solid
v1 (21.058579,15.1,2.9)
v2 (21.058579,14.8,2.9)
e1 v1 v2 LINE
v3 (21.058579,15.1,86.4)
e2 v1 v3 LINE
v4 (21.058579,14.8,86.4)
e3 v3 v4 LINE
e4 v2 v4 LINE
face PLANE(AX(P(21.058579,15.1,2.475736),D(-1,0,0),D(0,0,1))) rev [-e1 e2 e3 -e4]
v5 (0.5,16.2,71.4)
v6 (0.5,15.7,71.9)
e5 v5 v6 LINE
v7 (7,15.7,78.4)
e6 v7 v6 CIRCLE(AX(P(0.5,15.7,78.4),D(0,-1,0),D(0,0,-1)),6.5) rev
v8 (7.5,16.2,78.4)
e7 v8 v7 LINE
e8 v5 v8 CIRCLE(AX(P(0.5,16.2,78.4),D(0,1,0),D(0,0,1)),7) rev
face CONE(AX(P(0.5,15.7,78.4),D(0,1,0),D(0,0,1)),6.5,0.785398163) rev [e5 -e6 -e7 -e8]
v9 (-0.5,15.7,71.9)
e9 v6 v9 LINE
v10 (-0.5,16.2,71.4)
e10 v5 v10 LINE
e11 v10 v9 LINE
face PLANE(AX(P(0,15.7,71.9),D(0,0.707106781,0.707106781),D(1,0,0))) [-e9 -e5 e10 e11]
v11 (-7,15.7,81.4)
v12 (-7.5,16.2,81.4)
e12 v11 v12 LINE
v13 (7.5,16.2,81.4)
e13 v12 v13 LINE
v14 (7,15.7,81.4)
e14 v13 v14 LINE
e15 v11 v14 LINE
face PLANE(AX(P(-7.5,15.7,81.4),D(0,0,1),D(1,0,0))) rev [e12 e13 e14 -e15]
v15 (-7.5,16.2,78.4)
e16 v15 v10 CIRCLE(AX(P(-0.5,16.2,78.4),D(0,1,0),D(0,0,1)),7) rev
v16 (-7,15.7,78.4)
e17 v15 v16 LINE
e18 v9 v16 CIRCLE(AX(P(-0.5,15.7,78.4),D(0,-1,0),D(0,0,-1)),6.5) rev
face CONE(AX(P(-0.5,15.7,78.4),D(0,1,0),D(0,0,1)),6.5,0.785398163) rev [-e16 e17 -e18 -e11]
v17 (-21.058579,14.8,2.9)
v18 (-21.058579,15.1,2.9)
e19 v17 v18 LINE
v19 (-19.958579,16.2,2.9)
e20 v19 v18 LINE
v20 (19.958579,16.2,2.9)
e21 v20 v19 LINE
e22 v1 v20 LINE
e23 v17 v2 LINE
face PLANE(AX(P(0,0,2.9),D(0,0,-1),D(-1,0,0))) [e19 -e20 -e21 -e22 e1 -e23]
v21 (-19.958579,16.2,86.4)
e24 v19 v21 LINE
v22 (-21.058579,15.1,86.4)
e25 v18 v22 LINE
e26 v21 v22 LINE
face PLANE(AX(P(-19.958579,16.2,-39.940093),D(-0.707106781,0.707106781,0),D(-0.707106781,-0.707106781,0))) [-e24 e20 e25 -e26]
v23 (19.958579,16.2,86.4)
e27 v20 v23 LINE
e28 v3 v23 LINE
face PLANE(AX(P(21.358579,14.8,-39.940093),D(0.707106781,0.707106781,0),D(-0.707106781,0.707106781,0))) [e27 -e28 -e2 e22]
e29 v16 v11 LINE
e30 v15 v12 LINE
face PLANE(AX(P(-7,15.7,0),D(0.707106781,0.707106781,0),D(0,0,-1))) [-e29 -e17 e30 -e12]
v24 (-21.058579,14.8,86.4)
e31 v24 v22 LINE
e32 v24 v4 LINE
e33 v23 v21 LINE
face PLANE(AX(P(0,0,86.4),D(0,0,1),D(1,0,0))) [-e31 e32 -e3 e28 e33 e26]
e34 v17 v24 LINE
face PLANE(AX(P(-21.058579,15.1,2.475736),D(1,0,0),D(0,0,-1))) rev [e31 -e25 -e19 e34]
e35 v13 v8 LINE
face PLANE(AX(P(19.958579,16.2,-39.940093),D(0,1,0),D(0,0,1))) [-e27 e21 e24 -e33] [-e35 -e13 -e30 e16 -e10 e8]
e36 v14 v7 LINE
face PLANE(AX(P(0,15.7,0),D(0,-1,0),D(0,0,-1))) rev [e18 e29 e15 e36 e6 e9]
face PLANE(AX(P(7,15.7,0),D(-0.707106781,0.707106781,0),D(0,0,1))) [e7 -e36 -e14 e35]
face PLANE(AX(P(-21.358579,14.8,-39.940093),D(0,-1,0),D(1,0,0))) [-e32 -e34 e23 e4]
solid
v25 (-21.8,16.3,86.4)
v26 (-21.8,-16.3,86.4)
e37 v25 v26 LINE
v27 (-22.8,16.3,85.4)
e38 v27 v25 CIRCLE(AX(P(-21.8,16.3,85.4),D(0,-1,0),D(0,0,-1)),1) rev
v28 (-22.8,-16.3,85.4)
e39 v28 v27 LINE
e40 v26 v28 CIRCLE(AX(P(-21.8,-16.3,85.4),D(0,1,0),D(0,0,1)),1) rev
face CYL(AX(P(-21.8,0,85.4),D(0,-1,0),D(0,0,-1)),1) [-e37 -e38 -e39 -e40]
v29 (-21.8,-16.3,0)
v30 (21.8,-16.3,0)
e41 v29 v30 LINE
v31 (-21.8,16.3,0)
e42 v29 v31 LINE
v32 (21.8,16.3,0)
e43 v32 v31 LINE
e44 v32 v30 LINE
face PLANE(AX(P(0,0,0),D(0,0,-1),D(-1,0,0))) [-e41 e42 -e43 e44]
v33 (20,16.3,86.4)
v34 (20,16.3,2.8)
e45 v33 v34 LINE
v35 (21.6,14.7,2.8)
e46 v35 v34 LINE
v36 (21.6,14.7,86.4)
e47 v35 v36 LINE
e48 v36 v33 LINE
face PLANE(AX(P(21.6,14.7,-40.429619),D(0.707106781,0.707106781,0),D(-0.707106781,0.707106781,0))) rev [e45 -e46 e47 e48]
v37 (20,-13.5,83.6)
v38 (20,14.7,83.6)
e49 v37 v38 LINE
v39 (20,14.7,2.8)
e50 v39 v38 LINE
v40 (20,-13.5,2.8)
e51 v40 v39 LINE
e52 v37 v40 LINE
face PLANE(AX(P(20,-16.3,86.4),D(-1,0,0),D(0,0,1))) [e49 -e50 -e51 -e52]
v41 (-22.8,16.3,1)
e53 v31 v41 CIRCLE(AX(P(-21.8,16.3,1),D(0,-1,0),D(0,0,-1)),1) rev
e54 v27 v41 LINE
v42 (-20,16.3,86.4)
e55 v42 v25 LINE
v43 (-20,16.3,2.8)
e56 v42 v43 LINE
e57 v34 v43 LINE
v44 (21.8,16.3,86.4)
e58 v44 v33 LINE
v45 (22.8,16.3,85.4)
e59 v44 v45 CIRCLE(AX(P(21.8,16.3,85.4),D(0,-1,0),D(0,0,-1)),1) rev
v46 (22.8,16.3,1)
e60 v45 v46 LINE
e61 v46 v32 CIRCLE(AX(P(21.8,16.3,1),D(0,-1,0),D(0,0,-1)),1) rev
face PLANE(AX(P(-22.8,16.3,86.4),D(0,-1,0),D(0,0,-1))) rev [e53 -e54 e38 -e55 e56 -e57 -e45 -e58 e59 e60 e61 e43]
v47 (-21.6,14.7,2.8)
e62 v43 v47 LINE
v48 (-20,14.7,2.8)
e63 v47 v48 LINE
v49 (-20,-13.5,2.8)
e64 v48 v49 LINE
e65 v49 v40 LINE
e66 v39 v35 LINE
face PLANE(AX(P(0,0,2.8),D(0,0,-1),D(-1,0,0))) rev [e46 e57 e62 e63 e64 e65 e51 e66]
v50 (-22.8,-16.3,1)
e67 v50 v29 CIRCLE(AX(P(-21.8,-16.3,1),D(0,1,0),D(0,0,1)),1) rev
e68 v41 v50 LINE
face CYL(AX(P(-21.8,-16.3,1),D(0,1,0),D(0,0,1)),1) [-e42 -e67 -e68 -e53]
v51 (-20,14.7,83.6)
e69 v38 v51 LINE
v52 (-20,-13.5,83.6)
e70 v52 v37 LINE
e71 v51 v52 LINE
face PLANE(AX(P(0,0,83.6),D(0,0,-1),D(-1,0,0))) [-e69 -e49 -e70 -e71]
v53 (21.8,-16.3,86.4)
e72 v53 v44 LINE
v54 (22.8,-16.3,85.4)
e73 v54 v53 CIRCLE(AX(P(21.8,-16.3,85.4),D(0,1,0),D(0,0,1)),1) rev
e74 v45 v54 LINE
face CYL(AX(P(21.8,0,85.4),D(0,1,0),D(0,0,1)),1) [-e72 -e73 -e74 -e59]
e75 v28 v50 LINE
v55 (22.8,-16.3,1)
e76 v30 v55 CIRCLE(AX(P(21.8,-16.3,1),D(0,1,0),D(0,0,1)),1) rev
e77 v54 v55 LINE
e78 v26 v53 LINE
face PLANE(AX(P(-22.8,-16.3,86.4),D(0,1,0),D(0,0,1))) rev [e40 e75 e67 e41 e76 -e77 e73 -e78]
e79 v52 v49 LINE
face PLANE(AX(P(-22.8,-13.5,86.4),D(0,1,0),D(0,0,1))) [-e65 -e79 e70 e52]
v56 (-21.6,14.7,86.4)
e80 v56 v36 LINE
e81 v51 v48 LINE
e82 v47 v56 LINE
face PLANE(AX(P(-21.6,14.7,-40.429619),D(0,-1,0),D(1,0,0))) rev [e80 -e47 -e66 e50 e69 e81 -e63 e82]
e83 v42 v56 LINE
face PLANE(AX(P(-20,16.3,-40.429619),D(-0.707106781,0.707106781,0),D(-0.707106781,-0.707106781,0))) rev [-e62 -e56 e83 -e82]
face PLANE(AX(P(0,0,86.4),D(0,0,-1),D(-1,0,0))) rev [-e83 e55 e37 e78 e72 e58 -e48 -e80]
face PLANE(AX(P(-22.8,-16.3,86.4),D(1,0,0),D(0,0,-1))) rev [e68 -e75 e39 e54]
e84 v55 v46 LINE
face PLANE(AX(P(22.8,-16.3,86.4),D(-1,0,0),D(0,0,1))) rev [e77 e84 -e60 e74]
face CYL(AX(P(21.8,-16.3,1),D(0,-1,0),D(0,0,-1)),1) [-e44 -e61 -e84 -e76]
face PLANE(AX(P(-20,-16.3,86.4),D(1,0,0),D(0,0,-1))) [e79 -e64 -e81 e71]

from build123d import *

# Parameters (mm, degrees)
SKETCH1_W           = 45.6
SKETCH1_H           = 32.6
BOSS_EXTRUDE1_DEPTH = 86.4
SHELL1_T            = -2.8
CUT_EXTRUDE1_DEPTH  = 83.6
BOSS_EXTRUDE2_DEPTH = 83.5
SKETCH5_W           = 15
SKETCH5_H           = 10
CUT_EXTRUDE3_DEPTH  = 0.5
FILLET1_R           = 7
CHAMFER1_SIZE       = 0.5
FILLET2_R           = 1
CUT_EXTRUDE4_DEPTH  = 83.5


with BuildPart() as part:
    # Sketch1 → Boss-Extrude1 (new body)
    with BuildSketch(Plane.XY):
        Rectangle(SKETCH1_W, SKETCH1_H)
    extrude(amount=BOSS_EXTRUDE1_DEPTH)

    # Shell1
    shell1_openings = [part.faces().sort_by_distance(p)[0] for p in [
        (0, 16.3, 43.2),
    ]]
    offset(amount=SHELL1_T, openings=shell1_openings, kind=Kind.INTERSECTION)

    # Sketch2 → Cut-Extrude1 (cut)
    with BuildSketch(Plane.XY.offset(86.4)):
        Polygon((20, 16.3), (-20, 16.3), (-21.6, 14.7), (21.6, 14.7), align=None)
    extrude(amount=-CUT_EXTRUDE1_DEPTH, mode=Mode.SUBTRACT)

    # Fillet2
    fillet2_edges = [part.edges().sort_by_distance(p)[0] for p in [
        (-22.8, 0, 86.4),
        (22.8, 0, 86.4),
        (-22.8, 0, 0),
        (22.8, 0, 0),
    ]]
    fillet(fillet2_edges, radius=FILLET2_R)


with BuildPart() as body_2:
    # Sketch3 → Boss-Extrude2 (new body)
    with BuildSketch(Plane.XY.offset(86.4)):
        Polygon((19.958578644, 16.2), (-19.958578644, 16.2), (-21.358578644, 14.8), (21.358578644, 14.8), align=None)
    extrude(amount=-BOSS_EXTRUDE2_DEPTH)

    # Sketch5 → Cut-Extrude3 (cut)
    with BuildSketch(Plane(origin=(0, 16.2, 0), x_dir=(1, 0, 0), z_dir=(0, 1, 0))):
        with Locations((0, -76.4)):
            Rectangle(SKETCH5_W, SKETCH5_H)
    extrude(amount=-CUT_EXTRUDE3_DEPTH, mode=Mode.SUBTRACT)

    # Fillet1
    fillet1_edges = [body_2.edges().sort_by_distance(p)[0] for p in [
        (7.5, 15.95, 71.4),
        (-7.5, 15.95, 71.4),
    ]]
    fillet(fillet1_edges, radius=FILLET1_R)

    # Chamfer1
    chamfer1_edges = [body_2.edges().sort_by_distance(p)[0] for p in [
        (7.5, 15.7, 79.9),
        (5.449747468, 15.7, 73.450252532),
        (0, 15.7, 71.4),
        (-7.5, 15.7, 79.9),
        (-5.449747468, 15.7, 73.450252532),
    ]]
    chamfer(chamfer1_edges, length=CHAMFER1_SIZE - 0.0001)  # a hair under: the kernel refuses the full size

    # Sketch6 → Cut-Extrude4 (cut)
    with BuildSketch(Plane.XY.offset(86.4)):
        Polygon((-21.058578644, 15.1), (-21.358578644, 14.8), (-21.058578644, 14.8), align=None)
        Polygon((21.058578644, 15.1), (21.058578644, 14.8), (21.358578644, 14.8), align=None)
    extrude(amount=-CUT_EXTRUDE4_DEPTH, mode=Mode.SUBTRACT)


solid = Compound([part.part, body_2.part])
